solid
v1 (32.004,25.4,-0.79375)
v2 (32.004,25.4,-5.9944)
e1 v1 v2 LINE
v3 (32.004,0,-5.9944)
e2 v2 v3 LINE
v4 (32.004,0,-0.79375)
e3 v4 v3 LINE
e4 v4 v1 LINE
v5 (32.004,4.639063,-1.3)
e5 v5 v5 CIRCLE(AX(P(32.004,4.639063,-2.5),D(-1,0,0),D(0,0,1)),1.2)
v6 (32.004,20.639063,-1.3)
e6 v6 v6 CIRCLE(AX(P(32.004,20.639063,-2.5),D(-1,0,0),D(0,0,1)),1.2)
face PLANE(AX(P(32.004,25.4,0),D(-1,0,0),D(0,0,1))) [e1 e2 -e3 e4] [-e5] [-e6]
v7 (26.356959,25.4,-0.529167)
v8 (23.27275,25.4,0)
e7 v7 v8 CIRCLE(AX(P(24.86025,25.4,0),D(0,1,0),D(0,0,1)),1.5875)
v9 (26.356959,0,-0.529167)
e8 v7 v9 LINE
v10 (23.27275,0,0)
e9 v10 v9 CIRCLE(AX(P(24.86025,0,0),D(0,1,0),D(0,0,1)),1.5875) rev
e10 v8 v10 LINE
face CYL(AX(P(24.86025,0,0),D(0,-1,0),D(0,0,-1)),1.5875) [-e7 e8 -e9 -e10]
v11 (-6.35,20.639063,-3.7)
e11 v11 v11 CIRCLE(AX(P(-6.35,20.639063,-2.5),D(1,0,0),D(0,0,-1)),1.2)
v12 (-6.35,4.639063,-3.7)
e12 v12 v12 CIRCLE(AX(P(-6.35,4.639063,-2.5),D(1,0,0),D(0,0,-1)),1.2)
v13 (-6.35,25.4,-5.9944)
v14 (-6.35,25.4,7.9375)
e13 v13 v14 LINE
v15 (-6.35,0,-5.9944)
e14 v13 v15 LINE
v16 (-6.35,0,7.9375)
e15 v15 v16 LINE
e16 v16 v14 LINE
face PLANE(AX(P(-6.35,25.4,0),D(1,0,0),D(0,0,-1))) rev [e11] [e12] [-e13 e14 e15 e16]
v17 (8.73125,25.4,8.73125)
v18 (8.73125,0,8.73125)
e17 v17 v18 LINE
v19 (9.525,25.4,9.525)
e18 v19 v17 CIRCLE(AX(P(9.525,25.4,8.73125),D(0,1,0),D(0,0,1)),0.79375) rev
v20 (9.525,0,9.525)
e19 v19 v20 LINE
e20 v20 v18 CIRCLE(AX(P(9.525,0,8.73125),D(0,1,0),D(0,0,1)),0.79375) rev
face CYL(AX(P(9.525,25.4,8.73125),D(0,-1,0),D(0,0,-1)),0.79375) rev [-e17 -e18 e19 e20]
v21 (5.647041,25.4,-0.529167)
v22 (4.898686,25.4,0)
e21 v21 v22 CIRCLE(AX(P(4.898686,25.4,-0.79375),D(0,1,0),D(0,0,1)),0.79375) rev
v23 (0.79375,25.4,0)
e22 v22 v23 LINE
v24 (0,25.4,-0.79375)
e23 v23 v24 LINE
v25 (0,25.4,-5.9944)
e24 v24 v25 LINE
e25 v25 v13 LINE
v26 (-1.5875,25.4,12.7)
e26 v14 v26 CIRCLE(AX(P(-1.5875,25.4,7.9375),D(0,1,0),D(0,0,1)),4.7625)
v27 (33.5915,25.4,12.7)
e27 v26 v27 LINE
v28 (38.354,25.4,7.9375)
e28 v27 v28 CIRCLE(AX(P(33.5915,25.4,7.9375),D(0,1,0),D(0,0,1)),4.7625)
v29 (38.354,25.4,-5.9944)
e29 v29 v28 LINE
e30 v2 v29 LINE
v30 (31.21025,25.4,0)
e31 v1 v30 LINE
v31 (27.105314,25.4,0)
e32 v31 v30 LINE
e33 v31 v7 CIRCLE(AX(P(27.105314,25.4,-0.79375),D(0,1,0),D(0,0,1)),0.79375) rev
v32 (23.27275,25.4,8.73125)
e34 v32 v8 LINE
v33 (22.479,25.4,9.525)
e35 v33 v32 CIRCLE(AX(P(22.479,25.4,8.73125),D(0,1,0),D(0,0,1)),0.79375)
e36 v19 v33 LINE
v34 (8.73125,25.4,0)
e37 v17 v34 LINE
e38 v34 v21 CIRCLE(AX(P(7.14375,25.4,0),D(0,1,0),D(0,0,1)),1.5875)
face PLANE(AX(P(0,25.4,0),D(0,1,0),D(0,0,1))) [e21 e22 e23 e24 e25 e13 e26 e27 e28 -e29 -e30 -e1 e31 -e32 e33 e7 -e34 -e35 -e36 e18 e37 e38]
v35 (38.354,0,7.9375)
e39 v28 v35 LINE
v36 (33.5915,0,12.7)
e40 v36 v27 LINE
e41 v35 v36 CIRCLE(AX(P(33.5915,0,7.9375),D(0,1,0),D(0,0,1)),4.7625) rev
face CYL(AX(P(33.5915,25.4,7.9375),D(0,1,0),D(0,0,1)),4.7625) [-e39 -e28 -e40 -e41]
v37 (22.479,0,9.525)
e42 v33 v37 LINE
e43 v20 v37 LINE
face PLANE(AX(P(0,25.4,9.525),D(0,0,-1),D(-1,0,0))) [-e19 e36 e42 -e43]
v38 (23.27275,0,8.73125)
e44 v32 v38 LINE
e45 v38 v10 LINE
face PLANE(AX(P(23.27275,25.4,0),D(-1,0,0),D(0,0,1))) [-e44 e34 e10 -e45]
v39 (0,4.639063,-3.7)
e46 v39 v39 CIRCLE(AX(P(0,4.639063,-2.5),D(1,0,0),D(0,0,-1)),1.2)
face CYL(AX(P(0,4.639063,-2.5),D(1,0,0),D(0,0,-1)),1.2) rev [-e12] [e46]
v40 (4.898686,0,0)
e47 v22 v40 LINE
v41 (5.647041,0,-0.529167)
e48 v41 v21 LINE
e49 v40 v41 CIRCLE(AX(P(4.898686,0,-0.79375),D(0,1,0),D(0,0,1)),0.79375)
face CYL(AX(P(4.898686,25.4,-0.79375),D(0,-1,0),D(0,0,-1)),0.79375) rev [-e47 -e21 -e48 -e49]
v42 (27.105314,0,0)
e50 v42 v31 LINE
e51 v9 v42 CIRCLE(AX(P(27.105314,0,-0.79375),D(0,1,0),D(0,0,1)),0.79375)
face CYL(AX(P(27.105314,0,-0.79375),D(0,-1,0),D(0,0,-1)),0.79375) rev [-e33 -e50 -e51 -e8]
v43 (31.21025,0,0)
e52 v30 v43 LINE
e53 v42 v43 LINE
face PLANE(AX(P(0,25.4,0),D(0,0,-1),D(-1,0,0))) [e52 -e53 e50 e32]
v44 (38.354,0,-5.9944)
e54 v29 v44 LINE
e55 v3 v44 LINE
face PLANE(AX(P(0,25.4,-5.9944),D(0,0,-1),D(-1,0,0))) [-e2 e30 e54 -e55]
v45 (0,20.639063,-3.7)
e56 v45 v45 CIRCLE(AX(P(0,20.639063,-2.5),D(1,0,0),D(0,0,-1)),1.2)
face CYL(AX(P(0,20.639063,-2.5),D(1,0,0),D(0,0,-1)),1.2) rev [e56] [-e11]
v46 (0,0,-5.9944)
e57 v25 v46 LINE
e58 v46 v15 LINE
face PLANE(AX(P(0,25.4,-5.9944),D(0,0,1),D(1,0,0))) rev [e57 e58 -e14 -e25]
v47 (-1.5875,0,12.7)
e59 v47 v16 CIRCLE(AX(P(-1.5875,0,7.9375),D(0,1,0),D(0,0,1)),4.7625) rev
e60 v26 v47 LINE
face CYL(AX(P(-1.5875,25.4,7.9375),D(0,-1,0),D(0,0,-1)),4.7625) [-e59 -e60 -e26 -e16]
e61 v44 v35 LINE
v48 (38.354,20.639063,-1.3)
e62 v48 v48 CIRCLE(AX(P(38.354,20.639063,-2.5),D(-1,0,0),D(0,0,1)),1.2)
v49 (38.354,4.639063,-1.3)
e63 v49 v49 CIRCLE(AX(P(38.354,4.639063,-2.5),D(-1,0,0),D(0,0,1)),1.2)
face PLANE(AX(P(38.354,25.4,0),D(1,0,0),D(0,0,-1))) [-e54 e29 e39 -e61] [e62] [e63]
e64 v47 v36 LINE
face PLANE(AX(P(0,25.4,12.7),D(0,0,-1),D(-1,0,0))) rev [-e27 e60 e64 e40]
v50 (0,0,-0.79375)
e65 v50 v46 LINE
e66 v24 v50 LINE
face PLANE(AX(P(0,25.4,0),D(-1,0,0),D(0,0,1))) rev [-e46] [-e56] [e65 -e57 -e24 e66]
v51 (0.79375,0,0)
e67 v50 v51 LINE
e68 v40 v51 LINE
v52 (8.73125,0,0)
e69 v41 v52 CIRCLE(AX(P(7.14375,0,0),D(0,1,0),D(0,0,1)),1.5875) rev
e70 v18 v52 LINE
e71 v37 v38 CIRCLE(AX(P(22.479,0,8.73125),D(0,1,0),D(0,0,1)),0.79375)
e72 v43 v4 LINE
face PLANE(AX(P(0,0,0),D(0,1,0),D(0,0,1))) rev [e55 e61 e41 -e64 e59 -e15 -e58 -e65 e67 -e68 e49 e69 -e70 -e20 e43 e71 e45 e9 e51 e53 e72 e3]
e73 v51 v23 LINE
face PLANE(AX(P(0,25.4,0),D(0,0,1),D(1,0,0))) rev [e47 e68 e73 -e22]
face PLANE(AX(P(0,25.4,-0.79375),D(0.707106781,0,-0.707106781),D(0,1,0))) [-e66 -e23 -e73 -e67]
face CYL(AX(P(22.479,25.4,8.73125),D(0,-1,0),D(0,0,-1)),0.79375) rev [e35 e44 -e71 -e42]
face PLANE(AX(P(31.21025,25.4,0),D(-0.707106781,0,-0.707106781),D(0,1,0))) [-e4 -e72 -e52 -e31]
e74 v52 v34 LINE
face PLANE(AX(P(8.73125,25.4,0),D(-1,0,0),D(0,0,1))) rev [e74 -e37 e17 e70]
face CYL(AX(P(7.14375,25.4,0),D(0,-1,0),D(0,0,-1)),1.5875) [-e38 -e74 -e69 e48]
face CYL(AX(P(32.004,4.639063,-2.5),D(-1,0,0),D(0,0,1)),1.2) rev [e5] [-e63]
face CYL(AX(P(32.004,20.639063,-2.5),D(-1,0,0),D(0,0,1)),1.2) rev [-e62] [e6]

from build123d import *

# Parameters (mm, degrees)
BOSS_EXTRUDE1_DEPTH           = 25.4
CHAMFER1_SIZE                 = 0.79375
SKETCH4_W                     = 1.2
SKETCH4_H                     = 6.35
M2_CLEARANCE_HOLE1_AT_2_COUNT = 2
M2_CLEARANCE_HOLE1_AT_2_PITCH = 16
FILLET1_R                     = 4.7625
FILLET5_R                     = 1.5875
FILLET6_R                     = 1.5875
FILLET7_R                     = 0.79375
SKETCH6_W                     = 1.2
SKETCH6_H                     = 6.35
M2_CLEARANCE_HOLE2_AT_2_COUNT = 2
M2_CLEARANCE_HOLE2_AT_2_PITCH = 16


with BuildPart() as part:
    # Sketch1 → Boss-Extrude1 (new body)
    with BuildSketch(Plane(origin=(0, 0, 0), x_dir=(1, 0, 0), z_dir=(0, 1, 0))):
        with BuildLine():
            Line((0, 0), (0, 5.9944))
            Line((0, 5.9944), (-6.35, 5.9944))
            Line((-6.35, 5.9944), (-6.35, -12.7))
            Line((-6.35, -12.7), (38.354, -12.7))
            Line((38.354, -12.7), (38.354, 5.9944))
            Line((38.354, 5.9944), (32.004, 5.9944))
            Line((32.004, 5.9944), (32.004, 0))
            Line((32.004, 0), (26.44775, 0))
            Line((26.44775, 0), (26.44775, 1.5875))
            Line((26.44775, 1.5875), (23.27275, 1.5875))
            Line((23.27275, 1.5875), (23.27275, -8.73125))
            ThreePointArc((23.27275, -8.73125), (23.040266008, -9.292516008), (22.479, -9.525))
            Line((22.479, -9.525), (9.525, -9.525))
            ThreePointArc((9.525, -9.525), (8.963733992, -9.292516008), (8.73125, -8.73125))
            Line((8.73125, -8.73125), (8.73125, 1.5875))
            Line((8.73125, 1.5875), (5.55625, 1.5875))
            Line((5.55625, 1.5875), (5.55625, 0))
            Line((5.55625, 0), (0, 0))
        make_face()
    extrude(amount=BOSS_EXTRUDE1_DEPTH)

    # Chamfer1
    chamfer1_edges = [part.edges().sort_by_distance(p)[0] for p in [
        (0, 12.7, 0),
        (32.004, 12.7, 0),
    ]]
    chamfer(chamfer1_edges, length=CHAMFER1_SIZE)

    # Sketch4 → M2 Clearance Hole1 (revolve, cut)
    with BuildSketch(Plane(origin=(0, 20.6390625, -2.5), x_dir=(0, 0, -1), z_dir=(0, 1, 0))):
        with Locations((0.6, 3.175)):
            Rectangle(SKETCH4_W, SKETCH4_H)
    m2_clearance_hole1 = revolve(axis=Axis((6.35, 20.6390625, -2.5), (-1, 0, 0)), mode=Mode.SUBTRACT)

    # M2 Clearance Hole1 at 2: M2 Clearance Hole1 ×2
    with Locations(*[(0, -i * M2_CLEARANCE_HOLE1_AT_2_PITCH, 0) for i in range(1, M2_CLEARANCE_HOLE1_AT_2_COUNT)]):
        add(m2_clearance_hole1, mode=Mode.SUBTRACT)

    # Fillet1
    fillet1_edges = [part.edges().sort_by_distance(p)[0] for p in [
        (-6.35, 12.7, 12.7),
        (38.354, 12.7, 12.7),
    ]]
    fillet(fillet1_edges, radius=FILLET1_R)

    # Fillet5
    fillet5_edges = [part.edges().sort_by_distance(p)[0] for p in [
        (5.55625, 12.7, -1.5875),
        (8.73125, 12.7, -1.5875),
    ]]
    fillet(fillet5_edges, radius=FILLET5_R - 0.0001)  # a hair under: the kernel refuses the full size

    # Fillet6
    fillet6_edges = [part.edges().sort_by_distance(p)[0] for p in [
        (23.27275, 12.7, -1.5875),
        (26.44775, 12.7, -1.5875),
    ]]
    fillet(fillet6_edges, radius=FILLET6_R - 0.0001)  # a hair under: the kernel refuses the full size

    # Fillet7
    fillet7_edges = [part.edges().sort_by_distance(p)[0] for p in [
        (5.55625, 12.7, 0),
        (26.44775, 12.7, 0),
    ]]
    fillet(fillet7_edges, radius=FILLET7_R)

    # Sketch6 → M2 Clearance Hole2 (revolve, cut)
    with BuildSketch(Plane(origin=(32.004, 4.6390625, -2.5), x_dir=(0, 0, 1), z_dir=(0, 1, 0))):
        with Locations((0.6, 3.175)):
            Rectangle(SKETCH6_W, SKETCH6_H)
    m2_clearance_hole2 = revolve(axis=Axis((25.654, 4.6390625, -2.5), (1, 0, 0)), mode=Mode.SUBTRACT)

    # M2 Clearance Hole2 at 2: M2 Clearance Hole2 ×2
    with Locations(*[(0, i * M2_CLEARANCE_HOLE2_AT_2_PITCH, 0) for i in range(1, M2_CLEARANCE_HOLE2_AT_2_COUNT)]):
        add(m2_clearance_hole2, mode=Mode.SUBTRACT)


solid = part.part
